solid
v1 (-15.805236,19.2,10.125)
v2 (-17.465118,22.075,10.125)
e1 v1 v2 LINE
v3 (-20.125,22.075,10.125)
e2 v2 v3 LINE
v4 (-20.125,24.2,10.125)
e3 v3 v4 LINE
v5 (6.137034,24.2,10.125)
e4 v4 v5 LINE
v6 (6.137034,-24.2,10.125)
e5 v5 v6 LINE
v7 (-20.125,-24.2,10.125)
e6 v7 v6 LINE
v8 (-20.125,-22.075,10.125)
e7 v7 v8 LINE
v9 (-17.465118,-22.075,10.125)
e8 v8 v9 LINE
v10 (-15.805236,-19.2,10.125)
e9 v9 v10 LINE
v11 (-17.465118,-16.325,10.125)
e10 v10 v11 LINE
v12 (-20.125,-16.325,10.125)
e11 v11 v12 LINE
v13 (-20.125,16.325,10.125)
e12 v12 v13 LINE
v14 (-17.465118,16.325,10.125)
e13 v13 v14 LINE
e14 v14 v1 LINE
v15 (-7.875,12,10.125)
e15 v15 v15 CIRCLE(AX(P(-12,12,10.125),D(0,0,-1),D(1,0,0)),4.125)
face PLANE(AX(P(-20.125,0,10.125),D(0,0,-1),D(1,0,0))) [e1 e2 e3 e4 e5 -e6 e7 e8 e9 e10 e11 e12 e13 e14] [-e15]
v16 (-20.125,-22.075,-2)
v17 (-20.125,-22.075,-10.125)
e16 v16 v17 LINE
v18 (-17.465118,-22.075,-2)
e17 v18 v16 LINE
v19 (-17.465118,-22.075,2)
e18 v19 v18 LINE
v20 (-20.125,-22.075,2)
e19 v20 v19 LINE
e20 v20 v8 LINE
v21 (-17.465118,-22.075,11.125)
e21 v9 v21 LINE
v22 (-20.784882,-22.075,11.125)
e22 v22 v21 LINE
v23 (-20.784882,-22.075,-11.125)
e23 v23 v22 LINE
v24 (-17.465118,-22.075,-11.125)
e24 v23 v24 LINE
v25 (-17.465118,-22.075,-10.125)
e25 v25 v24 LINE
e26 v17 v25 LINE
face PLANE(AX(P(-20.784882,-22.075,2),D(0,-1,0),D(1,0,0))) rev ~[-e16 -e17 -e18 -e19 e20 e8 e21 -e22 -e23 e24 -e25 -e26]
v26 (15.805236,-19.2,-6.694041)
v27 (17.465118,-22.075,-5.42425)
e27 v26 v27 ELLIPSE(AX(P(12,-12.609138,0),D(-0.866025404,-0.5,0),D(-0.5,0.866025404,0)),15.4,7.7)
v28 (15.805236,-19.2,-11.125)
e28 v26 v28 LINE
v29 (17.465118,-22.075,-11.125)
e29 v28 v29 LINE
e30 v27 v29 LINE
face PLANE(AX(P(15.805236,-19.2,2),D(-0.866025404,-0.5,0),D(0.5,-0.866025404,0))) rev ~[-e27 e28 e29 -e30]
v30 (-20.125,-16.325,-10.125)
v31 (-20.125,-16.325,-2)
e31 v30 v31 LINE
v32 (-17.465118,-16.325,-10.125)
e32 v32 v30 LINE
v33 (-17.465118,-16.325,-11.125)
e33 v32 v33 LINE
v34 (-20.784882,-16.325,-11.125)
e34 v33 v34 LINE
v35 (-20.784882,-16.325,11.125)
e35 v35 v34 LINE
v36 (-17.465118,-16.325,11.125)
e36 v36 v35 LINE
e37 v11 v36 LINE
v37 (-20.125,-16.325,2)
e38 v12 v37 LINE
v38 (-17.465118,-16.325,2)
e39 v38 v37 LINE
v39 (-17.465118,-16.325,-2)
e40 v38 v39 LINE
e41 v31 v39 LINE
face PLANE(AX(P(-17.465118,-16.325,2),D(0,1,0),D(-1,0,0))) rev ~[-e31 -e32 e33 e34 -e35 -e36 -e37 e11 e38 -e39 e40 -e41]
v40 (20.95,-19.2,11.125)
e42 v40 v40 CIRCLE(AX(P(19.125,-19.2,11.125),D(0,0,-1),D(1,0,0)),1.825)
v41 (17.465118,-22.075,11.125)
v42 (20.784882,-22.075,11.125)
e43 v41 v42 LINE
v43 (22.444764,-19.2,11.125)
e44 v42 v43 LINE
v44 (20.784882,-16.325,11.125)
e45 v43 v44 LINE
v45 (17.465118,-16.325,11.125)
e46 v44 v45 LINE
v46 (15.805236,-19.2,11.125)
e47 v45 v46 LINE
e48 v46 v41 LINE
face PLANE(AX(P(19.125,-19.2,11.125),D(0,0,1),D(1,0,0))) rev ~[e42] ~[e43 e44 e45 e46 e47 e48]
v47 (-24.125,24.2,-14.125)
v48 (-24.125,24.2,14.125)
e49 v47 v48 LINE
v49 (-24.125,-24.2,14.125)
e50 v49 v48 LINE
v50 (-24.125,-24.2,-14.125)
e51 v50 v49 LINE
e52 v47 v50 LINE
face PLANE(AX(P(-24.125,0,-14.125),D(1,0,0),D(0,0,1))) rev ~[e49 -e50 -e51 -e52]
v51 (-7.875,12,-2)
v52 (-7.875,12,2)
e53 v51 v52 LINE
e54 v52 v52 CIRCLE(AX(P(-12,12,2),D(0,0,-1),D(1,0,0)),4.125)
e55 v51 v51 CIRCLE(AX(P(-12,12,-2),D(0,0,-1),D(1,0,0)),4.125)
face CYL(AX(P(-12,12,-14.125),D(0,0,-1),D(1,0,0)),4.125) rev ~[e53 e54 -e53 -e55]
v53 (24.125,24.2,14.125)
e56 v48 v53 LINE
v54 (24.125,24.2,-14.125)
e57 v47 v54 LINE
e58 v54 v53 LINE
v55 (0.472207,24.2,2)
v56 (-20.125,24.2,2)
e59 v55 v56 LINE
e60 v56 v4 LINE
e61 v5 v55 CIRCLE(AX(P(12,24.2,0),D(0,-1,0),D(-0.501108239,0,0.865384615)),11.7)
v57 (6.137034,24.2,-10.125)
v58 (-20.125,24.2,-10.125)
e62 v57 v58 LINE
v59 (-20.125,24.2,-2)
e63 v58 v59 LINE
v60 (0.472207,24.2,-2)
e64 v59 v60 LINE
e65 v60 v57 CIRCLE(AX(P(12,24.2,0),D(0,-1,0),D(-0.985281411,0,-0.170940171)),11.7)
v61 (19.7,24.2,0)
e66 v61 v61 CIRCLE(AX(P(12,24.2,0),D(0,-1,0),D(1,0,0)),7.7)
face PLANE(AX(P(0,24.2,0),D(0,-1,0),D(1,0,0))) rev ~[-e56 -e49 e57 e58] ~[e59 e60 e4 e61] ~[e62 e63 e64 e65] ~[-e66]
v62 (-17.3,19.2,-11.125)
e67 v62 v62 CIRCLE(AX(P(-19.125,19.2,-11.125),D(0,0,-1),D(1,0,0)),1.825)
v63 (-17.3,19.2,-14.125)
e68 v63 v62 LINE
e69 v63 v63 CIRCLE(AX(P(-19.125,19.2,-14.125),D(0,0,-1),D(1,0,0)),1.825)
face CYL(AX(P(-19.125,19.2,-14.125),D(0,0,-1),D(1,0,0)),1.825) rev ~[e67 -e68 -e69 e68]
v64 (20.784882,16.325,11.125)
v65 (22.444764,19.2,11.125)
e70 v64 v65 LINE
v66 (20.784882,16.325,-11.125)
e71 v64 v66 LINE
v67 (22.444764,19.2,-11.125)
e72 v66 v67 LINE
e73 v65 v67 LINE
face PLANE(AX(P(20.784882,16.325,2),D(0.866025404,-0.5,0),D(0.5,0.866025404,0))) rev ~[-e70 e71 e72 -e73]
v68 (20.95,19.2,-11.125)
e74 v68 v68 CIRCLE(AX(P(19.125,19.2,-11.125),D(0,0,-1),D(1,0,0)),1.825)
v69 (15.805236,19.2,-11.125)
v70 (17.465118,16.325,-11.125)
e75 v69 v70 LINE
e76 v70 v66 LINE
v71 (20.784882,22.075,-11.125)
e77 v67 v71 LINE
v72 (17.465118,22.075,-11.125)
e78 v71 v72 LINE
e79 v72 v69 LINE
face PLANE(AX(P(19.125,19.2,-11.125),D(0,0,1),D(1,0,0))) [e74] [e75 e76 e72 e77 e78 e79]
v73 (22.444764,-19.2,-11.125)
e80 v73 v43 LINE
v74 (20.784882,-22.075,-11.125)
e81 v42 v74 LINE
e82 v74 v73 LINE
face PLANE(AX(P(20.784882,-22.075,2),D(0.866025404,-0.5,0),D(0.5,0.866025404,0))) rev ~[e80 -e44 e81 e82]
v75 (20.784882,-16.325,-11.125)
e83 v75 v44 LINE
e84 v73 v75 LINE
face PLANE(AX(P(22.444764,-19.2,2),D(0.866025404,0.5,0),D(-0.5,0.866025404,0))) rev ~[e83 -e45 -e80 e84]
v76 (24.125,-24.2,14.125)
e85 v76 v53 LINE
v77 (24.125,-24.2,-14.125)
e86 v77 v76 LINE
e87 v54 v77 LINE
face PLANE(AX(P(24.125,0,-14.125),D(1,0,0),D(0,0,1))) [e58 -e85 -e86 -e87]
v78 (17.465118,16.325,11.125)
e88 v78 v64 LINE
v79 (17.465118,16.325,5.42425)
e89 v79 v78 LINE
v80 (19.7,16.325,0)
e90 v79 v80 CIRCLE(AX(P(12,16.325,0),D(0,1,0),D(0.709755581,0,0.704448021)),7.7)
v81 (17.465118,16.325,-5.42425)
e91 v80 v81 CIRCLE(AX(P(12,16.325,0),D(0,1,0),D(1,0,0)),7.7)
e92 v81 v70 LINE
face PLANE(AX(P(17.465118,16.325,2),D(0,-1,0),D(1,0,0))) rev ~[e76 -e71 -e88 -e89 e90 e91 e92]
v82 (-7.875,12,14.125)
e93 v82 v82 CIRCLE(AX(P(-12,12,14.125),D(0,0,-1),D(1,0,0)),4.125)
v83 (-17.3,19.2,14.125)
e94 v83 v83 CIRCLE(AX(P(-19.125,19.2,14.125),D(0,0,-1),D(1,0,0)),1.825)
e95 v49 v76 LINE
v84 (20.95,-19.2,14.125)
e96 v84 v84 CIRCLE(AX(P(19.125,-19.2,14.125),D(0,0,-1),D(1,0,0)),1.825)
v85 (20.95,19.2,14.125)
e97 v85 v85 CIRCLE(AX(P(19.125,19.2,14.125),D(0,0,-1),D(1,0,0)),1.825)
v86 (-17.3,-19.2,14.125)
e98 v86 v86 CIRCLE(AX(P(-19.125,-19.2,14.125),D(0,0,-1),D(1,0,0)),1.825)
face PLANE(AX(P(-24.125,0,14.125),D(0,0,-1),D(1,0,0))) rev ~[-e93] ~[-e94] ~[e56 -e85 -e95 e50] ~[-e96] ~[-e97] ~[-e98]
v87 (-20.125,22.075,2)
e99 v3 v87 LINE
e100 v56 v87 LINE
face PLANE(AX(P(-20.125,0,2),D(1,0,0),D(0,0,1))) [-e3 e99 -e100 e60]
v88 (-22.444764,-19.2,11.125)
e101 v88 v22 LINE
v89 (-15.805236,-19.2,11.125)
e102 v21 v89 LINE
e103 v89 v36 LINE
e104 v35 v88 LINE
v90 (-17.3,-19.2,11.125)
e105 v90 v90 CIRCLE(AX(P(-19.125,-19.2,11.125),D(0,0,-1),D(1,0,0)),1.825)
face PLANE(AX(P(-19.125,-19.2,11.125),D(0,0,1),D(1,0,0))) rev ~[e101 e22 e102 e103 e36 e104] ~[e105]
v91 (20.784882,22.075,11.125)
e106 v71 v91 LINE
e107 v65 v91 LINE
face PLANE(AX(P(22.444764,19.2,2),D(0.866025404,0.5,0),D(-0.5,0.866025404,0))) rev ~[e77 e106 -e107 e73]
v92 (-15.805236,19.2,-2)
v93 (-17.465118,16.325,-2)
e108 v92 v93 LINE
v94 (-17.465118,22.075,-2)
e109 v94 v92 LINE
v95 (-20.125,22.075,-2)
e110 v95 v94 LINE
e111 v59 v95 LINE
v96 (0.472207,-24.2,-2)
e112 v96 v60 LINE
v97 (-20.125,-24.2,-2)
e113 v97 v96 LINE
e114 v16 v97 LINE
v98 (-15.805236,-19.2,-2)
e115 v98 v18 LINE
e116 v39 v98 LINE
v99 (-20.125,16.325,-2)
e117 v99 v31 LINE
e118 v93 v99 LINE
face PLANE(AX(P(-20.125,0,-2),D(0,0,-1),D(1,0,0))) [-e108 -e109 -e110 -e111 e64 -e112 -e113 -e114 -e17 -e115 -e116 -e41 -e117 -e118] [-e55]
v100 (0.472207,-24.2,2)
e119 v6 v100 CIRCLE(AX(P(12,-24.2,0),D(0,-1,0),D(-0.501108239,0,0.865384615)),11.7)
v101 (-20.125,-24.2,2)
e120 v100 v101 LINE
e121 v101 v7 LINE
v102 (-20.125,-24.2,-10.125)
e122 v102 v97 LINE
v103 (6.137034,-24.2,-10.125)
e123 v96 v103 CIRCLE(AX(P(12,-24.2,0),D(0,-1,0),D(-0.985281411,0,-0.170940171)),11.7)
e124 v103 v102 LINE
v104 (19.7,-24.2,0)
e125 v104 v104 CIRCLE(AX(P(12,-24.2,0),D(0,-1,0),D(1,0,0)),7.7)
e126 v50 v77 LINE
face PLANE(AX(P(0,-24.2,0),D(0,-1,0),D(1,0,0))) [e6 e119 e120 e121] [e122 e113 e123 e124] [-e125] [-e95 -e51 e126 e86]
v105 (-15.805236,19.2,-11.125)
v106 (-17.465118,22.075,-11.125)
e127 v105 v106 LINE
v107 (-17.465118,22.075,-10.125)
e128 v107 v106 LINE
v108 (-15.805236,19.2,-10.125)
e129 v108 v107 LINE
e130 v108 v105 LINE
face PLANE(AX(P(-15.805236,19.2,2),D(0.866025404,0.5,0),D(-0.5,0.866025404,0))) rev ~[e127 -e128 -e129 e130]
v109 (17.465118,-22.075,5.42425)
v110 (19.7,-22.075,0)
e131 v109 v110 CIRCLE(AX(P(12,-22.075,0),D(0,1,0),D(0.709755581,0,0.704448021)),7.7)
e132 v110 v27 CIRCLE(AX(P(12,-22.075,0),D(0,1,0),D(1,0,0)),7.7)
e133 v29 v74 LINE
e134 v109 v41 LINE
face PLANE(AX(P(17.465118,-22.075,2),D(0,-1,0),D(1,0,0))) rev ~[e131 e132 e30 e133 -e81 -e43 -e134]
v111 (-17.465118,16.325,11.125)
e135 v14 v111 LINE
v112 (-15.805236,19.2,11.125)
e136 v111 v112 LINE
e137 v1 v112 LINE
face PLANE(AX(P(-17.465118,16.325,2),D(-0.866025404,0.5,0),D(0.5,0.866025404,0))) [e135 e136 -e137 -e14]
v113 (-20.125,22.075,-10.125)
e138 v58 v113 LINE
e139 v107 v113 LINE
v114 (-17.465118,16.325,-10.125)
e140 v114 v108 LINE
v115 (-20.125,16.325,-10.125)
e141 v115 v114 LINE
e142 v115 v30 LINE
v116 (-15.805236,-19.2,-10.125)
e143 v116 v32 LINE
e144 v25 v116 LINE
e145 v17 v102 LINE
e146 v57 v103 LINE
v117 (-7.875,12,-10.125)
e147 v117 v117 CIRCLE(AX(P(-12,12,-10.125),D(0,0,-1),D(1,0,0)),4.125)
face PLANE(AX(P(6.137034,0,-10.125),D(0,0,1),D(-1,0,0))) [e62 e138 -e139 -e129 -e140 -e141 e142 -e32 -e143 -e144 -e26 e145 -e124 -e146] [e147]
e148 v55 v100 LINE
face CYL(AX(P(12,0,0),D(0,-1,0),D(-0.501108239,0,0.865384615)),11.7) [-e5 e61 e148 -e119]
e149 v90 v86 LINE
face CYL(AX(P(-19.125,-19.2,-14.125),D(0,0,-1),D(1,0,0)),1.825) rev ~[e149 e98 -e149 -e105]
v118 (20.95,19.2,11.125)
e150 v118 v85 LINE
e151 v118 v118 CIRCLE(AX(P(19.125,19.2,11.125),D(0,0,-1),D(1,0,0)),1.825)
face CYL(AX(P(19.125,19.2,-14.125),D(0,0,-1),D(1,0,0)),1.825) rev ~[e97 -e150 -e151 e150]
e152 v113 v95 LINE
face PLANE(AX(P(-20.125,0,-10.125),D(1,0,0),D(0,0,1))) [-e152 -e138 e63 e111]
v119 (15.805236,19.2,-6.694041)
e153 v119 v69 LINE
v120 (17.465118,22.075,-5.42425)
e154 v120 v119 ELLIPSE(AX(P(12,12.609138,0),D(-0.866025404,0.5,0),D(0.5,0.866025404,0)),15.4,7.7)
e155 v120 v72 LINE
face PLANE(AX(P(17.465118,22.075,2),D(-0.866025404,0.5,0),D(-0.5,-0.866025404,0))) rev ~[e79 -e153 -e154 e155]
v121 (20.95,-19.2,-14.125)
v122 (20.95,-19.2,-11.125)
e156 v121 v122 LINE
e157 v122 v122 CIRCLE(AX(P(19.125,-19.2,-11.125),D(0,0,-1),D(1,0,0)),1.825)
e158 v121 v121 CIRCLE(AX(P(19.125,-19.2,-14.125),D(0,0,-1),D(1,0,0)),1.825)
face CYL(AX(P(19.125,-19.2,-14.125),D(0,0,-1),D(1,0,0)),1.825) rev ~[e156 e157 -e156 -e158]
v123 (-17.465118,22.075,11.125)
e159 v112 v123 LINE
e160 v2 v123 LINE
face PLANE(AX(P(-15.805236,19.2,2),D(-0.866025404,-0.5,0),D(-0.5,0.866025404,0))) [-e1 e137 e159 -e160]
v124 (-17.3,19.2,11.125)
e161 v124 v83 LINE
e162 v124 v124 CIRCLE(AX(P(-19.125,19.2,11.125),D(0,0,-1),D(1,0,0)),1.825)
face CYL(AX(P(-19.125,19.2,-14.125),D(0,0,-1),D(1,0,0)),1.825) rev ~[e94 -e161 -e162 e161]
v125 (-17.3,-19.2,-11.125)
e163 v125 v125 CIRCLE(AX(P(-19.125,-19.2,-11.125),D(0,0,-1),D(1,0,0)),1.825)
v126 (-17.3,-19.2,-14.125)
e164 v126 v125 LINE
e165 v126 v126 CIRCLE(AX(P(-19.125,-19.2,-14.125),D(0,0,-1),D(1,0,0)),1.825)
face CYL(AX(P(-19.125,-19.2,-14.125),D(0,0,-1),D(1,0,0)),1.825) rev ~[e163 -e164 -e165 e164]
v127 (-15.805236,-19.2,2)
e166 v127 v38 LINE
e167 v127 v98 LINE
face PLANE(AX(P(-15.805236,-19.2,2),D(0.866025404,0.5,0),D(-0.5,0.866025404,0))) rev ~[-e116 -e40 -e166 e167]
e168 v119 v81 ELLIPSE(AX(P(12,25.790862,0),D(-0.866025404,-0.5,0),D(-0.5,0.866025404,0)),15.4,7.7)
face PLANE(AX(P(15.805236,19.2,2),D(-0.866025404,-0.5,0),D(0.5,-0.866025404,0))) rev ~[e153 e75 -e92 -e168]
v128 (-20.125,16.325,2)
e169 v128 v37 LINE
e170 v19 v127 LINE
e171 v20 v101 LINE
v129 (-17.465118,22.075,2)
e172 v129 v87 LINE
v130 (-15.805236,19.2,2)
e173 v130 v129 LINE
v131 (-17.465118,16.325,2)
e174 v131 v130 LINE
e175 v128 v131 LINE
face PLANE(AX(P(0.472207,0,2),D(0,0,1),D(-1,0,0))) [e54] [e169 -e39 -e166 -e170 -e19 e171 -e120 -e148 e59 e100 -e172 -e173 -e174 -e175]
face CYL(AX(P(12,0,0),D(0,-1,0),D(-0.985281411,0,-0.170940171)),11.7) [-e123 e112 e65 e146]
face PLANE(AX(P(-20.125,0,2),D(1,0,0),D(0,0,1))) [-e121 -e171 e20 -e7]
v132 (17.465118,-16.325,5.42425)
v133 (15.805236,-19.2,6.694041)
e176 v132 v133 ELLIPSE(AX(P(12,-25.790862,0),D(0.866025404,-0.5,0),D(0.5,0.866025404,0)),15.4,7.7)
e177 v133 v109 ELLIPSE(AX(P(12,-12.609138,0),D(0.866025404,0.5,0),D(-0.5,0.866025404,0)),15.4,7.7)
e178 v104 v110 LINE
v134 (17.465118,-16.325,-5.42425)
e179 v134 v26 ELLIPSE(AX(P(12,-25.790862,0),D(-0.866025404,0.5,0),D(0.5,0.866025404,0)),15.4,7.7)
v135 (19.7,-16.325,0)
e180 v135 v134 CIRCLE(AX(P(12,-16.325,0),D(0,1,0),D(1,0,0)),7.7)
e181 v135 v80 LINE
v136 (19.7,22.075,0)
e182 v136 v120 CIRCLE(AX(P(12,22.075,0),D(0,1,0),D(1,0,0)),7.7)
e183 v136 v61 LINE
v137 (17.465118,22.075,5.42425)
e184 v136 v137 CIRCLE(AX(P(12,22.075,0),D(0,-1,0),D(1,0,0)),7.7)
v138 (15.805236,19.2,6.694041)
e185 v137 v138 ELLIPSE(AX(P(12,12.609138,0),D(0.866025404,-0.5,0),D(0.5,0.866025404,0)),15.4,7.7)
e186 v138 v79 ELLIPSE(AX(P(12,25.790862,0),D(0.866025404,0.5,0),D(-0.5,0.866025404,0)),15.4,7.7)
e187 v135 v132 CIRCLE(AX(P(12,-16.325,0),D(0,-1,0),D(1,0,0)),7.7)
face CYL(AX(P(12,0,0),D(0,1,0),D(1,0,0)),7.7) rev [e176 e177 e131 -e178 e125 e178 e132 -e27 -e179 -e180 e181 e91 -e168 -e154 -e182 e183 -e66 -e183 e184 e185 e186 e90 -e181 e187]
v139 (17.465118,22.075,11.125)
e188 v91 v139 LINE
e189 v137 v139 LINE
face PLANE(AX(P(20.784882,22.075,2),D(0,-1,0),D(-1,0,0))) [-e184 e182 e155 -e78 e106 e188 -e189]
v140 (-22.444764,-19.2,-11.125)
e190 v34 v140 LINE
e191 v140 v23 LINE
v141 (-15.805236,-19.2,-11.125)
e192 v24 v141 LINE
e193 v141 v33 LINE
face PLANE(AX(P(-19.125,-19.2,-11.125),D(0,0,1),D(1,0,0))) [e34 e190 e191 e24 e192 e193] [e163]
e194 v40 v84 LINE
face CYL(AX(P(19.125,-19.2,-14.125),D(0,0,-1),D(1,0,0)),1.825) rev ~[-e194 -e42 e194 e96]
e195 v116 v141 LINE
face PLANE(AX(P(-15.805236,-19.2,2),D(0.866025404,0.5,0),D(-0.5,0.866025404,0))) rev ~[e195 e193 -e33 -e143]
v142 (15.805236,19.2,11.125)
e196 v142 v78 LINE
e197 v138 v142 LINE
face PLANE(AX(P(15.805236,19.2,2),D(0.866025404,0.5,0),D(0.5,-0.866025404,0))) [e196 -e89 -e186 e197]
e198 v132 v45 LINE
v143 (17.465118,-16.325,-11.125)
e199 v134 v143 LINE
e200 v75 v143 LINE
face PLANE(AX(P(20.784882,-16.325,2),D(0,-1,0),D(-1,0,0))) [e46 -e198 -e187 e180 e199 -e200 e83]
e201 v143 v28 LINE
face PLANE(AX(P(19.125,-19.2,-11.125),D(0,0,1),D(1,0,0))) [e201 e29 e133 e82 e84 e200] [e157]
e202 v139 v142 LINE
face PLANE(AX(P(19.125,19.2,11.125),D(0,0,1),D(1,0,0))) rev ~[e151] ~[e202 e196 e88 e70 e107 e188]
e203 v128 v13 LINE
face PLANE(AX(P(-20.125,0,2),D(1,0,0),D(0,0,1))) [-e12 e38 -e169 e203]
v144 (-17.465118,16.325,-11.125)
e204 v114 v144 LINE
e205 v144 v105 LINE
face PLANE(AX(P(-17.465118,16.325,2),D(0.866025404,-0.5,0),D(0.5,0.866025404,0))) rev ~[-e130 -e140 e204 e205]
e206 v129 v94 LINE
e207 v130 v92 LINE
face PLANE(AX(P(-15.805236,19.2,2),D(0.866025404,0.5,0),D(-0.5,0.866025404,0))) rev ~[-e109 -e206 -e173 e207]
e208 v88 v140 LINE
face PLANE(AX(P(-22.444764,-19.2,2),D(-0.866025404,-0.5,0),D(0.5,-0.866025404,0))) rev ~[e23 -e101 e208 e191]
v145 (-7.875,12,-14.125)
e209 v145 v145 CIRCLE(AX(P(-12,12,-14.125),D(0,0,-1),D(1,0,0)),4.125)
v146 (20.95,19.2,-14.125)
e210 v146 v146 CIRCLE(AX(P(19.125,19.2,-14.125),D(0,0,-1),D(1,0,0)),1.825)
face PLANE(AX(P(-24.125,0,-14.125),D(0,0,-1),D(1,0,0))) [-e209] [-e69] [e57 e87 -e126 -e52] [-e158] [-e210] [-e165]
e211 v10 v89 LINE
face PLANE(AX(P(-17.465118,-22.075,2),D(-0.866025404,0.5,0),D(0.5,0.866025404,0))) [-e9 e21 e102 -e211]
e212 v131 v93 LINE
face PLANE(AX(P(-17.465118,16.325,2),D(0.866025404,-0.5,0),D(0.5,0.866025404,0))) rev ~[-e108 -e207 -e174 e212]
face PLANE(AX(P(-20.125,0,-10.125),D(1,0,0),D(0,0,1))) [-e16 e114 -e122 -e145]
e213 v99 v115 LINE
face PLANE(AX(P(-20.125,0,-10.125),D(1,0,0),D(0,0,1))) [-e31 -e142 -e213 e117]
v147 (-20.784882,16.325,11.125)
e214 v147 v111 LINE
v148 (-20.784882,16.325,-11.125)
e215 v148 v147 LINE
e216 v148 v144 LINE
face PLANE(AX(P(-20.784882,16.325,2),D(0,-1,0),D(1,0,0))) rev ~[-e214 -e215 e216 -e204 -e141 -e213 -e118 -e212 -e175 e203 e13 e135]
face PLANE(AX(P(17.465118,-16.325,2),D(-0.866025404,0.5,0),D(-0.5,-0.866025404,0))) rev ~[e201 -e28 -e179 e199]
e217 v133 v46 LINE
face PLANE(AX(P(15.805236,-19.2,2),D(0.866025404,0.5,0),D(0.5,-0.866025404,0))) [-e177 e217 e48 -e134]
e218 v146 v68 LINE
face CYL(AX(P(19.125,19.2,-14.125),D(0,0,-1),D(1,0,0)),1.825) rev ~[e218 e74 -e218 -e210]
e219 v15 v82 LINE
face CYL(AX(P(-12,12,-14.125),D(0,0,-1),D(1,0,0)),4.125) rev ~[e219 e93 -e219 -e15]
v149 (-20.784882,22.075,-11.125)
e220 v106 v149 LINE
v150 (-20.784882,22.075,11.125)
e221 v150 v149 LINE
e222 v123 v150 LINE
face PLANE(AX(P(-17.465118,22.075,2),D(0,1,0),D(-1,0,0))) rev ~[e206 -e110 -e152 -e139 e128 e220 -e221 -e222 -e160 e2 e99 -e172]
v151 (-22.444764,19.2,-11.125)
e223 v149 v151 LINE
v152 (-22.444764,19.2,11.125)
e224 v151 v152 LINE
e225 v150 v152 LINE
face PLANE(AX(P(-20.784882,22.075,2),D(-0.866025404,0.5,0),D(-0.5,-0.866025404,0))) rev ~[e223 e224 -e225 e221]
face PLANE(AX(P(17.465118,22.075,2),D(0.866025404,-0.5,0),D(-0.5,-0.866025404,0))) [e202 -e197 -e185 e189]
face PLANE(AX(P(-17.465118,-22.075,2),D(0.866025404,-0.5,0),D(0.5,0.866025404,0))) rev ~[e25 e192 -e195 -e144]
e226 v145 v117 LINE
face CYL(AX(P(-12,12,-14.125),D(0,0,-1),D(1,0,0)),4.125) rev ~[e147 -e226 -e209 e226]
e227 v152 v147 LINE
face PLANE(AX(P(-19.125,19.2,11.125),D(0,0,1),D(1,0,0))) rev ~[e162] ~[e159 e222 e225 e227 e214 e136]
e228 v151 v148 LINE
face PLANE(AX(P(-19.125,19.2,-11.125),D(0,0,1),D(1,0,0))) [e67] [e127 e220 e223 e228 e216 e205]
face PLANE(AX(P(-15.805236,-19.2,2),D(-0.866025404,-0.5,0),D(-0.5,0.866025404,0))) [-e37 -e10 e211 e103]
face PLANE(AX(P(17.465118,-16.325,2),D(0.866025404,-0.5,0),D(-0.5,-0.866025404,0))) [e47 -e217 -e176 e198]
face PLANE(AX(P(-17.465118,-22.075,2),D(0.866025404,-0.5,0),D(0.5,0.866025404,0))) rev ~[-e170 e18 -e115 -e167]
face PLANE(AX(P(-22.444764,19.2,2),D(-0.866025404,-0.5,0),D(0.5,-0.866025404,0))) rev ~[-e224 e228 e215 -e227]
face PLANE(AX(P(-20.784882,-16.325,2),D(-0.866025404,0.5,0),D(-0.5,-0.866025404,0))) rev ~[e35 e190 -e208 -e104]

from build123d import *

# Parameters (mm, degrees)
F3_W          = 48.25
F3_H          = 28.25
F3_R          = 7.7
F4_DEPTH      = 24.2
F5_R          = 1.825
F6_DEPTH      = 28.25
F5_R_2        = 4.125
F7_DEPTH      = 28.25
F9_DEPTH      = 13.125
F9_DEPTH_BACK = 9.125


# Not quite as in the source:
# - a feature names something its author has since deleted; it is built from what else it names


with BuildPart() as f4:
    # F3 (on Front) → F4 (new body, symmetric)
    with BuildSketch(Plane.XZ):
        Rectangle(F3_W, F3_H)
        with BuildLine():
            ThreePointArc((23.5277925033, 2), (23.6568686252, 1.0037000824), (23.7, 0))
            ThreePointArc((23.7, 0), (23.6568686252, -1.0037000824), (23.5277925033, -2))
            ThreePointArc((23.5277925033, -2), (22.3372126342, -5.4801491728), (20.125, -8.4186920005))
            Line((20.125, -8.4186920005), (20.125, -10.125))
            Line((20.125, -10.125), (17.8629663994, -10.125))
            ThreePointArc((17.8629663994, -10.125), (15.9935594213, -10.9973398215), (14, -11.5277925033))
            ThreePointArc((14, -11.5277925033), (12, -11.7), (10, -11.5277925033))
            ThreePointArc((10, -11.5277925033), (8.0064405787, -10.9973398215), (6.1370336006, -10.125))
            Line((6.1370336006, -10.125), (-20.125, -10.125))
            Line((-20.125, -10.125), (-20.125, -2))
            Line((-20.125, -2), (-20.125, 2))
            Line((-20.125, 2), (-20.125, 10.125))
            Line((-20.125, 10.125), (6.1370336006, 10.125))
            ThreePointArc((6.1370336006, 10.125), (8.0064405787, 10.9973398215), (10, 11.5277925033))
            ThreePointArc((10, 11.5277925033), (12, 11.7), (14, 11.5277925033))
            ThreePointArc((14, 11.5277925033), (15.9935594213, 10.9973398215), (17.8629663994, 10.125))
            Line((17.8629663994, 10.125), (20.125, 10.125))
            Line((20.125, 10.125), (20.125, 8.4186920005))
            ThreePointArc((20.125, 8.4186920005), (22.3372126342, 5.4801491728), (23.5277925033, 2))
        make_face(mode=Mode.SUBTRACT)
        with BuildLine():
            Line((14, 10.125), (14, 11.5277925033))
            ThreePointArc((14, 11.5277925033), (12, 11.7), (10, 11.5277925033))
            Line((10, 11.5277925033), (10, 10.125))
            Line((10, 10.125), (14, 10.125))
        make_face()
        with BuildLine():
            Line((20.125, 2), (20.125, 8.4186920005))
            ThreePointArc((20.125, 8.4186920005), (19.045826619, 9.3405742466), (17.8629663994, 10.125))
            Line((17.8629663994, 10.125), (14, 10.125))
            Line((14, 10.125), (10, 10.125))
            Line((10, 10.125), (6.1370336006, 10.125))
            ThreePointArc((6.1370336006, 10.125), (2.4024206149, 6.6915222444), (0.4722074967, 2))
            ThreePointArc((0.4722074967, 2), (0.3, 0), (0.4722074967, -2))
            ThreePointArc((0.4722074967, -2), (2.4024206149, -6.6915222444), (6.1370336006, -10.125))
            Line((6.1370336006, -10.125), (10, -10.125))
            Line((10, -10.125), (14, -10.125))
            Line((14, -10.125), (17.8629663994, -10.125))
            ThreePointArc((17.8629663994, -10.125), (19.045826619, -9.3405742466), (20.125, -8.4186920005))
            Line((20.125, -8.4186920005), (20.125, -2))
            Line((20.125, -2), (20.125, 2))
        make_face()
        with Locations((12, 0)):
            Circle(F3_R, mode=Mode.SUBTRACT)
        with BuildLine():
            ThreePointArc((10, -11.5277925033), (12, -11.7), (14, -11.5277925033))
            Line((14, -11.5277925033), (14, -10.125))
            Line((14, -10.125), (10, -10.125))
            Line((10, -10.125), (10, -11.5277925033))
        make_face()
        with BuildLine():
            ThreePointArc((0.4722074967, -2), (0.3, 0), (0.4722074967, 2))
            Line((0.4722074967, 2), (-20.125, 2))
            Line((-20.125, 2), (-20.125, -2))
            Line((-20.125, -2), (0.4722074967, -2))
        make_face()
        with BuildLine():
            ThreePointArc((23.5277925033, -2), (23.6568686252, -1.0037000824), (23.7, 0))
            ThreePointArc((23.7, 0), (23.6568686252, 1.0037000824), (23.5277925033, 2))
            Line((23.5277925033, 2), (20.125, 2))
            Line((20.125, 2), (20.125, -2))
            Line((20.125, -2), (23.5277925033, -2))
        make_face()
        with BuildLine():
            Line((20.125, 2), (23.5277925033, 2))
            ThreePointArc((23.5277925033, 2), (22.3372126342, 5.4801491728), (20.125, 8.4186920005))
            Line((20.125, 8.4186920005), (20.125, 2))
        make_face()
        with BuildLine():
            ThreePointArc((20.125, -8.4186920005), (22.3372126342, -5.4801491728), (23.5277925033, -2))
            Line((23.5277925033, -2), (20.125, -2))
            Line((20.125, -2), (20.125, -8.4186920005))
        make_face()
        with BuildLine():
            Line((14, 10.125), (17.8629663994, 10.125))
            ThreePointArc((17.8629663994, 10.125), (15.9935594213, 10.9973398215), (14, 11.5277925033))
            Line((14, 11.5277925033), (14, 10.125))
        make_face()
        with BuildLine():
            Line((10, 10.125), (10, 11.5277925033))
            ThreePointArc((10, 11.5277925033), (8.0064405787, 10.9973398215), (6.1370336006, 10.125))
            Line((6.1370336006, 10.125), (10, 10.125))
        make_face()
        with BuildLine():
            ThreePointArc((17.8629663994, 10.125), (19.045826619, 9.3405742466), (20.125, 8.4186920005))
            Line((20.125, 8.4186920005), (20.125, 10.125))
            Line((20.125, 10.125), (17.8629663994, 10.125))
        make_face()
        with BuildLine():
            Line((20.125, -10.125), (20.125, -8.4186920005))
            ThreePointArc((20.125, -8.4186920005), (19.045826619, -9.3405742466), (17.8629663994, -10.125))
            Line((17.8629663994, -10.125), (20.125, -10.125))
        make_face()
        with BuildLine():
            ThreePointArc((14, -11.5277925033), (15.9935594213, -10.9973398215), (17.8629663994, -10.125))
            Line((17.8629663994, -10.125), (14, -10.125))
            Line((14, -10.125), (14, -11.5277925033))
        make_face()
        with BuildLine():
            ThreePointArc((6.1370336006, -10.125), (8.0064405787, -10.9973398215), (10, -11.5277925033))
            Line((10, -11.5277925033), (10, -10.125))
            Line((10, -10.125), (6.1370336006, -10.125))
        make_face()
    extrude(amount=F4_DEPTH, both=True)

    # F5 (on face) → F6 (cut)
    with BuildSketch(Plane(origin=(0, 0, -14.125), x_dir=(1, 0, 0), z_dir=(0, 0, -1))):
        with Locations((-19.125, 19.2)):
            Circle(F5_R)
        with Locations((19.125, 19.2)):
            Circle(F5_R)
        with Locations((19.125, -19.2)):
            Circle(F5_R)
        with Locations((-19.125, -19.2)):
            Circle(F5_R)
    extrude(amount=-F6_DEPTH, mode=Mode.SUBTRACT)

    # F5 (on face) → F7 (cut)
    with BuildSketch(Plane(origin=(0, 0, -14.125), x_dir=(1, 0, 0), z_dir=(0, 0, -1))):
        with Locations((-12, -12)):
            Circle(F5_R_2)
    extrude(amount=-F7_DEPTH, mode=Mode.SUBTRACT)

    # F8 (on face) → F9 (cut, two sides)
    with BuildSketch(Plane.XY.offset(2)) as f9_sk:
        Polygon((20.7848820239, -16.325), (17.4651179761, -16.325), (15.8052359522, -19.2), (17.4651179761, -22.075), (20.7848820239, -22.075), (22.4447640478, -19.2), align=None)
        Polygon((17.4651179761, 16.325), (20.7848820239, 16.325), (22.4447640478, 19.2), (20.7848820239, 22.075), (17.4651179761, 22.075), (15.8052359522, 19.2), align=None)
        Polygon((-20.7848820239, 16.325), (-17.4651179761, 16.325), (-15.8052359522, 19.2), (-17.4651179761, 22.075), (-20.7848820239, 22.075), (-22.4447640478, 19.2), align=None)
        Polygon((-17.4651179761, -16.325), (-20.7848820239, -16.325), (-22.4447640478, -19.2), (-20.7848820239, -22.075), (-17.4651179761, -22.075), (-15.8052359522, -19.2), align=None)
    extrude(amount=-F9_DEPTH, mode=Mode.SUBTRACT)
    extrude(f9_sk.sketch, amount=F9_DEPTH_BACK, mode=Mode.SUBTRACT)


solid = f4.part
